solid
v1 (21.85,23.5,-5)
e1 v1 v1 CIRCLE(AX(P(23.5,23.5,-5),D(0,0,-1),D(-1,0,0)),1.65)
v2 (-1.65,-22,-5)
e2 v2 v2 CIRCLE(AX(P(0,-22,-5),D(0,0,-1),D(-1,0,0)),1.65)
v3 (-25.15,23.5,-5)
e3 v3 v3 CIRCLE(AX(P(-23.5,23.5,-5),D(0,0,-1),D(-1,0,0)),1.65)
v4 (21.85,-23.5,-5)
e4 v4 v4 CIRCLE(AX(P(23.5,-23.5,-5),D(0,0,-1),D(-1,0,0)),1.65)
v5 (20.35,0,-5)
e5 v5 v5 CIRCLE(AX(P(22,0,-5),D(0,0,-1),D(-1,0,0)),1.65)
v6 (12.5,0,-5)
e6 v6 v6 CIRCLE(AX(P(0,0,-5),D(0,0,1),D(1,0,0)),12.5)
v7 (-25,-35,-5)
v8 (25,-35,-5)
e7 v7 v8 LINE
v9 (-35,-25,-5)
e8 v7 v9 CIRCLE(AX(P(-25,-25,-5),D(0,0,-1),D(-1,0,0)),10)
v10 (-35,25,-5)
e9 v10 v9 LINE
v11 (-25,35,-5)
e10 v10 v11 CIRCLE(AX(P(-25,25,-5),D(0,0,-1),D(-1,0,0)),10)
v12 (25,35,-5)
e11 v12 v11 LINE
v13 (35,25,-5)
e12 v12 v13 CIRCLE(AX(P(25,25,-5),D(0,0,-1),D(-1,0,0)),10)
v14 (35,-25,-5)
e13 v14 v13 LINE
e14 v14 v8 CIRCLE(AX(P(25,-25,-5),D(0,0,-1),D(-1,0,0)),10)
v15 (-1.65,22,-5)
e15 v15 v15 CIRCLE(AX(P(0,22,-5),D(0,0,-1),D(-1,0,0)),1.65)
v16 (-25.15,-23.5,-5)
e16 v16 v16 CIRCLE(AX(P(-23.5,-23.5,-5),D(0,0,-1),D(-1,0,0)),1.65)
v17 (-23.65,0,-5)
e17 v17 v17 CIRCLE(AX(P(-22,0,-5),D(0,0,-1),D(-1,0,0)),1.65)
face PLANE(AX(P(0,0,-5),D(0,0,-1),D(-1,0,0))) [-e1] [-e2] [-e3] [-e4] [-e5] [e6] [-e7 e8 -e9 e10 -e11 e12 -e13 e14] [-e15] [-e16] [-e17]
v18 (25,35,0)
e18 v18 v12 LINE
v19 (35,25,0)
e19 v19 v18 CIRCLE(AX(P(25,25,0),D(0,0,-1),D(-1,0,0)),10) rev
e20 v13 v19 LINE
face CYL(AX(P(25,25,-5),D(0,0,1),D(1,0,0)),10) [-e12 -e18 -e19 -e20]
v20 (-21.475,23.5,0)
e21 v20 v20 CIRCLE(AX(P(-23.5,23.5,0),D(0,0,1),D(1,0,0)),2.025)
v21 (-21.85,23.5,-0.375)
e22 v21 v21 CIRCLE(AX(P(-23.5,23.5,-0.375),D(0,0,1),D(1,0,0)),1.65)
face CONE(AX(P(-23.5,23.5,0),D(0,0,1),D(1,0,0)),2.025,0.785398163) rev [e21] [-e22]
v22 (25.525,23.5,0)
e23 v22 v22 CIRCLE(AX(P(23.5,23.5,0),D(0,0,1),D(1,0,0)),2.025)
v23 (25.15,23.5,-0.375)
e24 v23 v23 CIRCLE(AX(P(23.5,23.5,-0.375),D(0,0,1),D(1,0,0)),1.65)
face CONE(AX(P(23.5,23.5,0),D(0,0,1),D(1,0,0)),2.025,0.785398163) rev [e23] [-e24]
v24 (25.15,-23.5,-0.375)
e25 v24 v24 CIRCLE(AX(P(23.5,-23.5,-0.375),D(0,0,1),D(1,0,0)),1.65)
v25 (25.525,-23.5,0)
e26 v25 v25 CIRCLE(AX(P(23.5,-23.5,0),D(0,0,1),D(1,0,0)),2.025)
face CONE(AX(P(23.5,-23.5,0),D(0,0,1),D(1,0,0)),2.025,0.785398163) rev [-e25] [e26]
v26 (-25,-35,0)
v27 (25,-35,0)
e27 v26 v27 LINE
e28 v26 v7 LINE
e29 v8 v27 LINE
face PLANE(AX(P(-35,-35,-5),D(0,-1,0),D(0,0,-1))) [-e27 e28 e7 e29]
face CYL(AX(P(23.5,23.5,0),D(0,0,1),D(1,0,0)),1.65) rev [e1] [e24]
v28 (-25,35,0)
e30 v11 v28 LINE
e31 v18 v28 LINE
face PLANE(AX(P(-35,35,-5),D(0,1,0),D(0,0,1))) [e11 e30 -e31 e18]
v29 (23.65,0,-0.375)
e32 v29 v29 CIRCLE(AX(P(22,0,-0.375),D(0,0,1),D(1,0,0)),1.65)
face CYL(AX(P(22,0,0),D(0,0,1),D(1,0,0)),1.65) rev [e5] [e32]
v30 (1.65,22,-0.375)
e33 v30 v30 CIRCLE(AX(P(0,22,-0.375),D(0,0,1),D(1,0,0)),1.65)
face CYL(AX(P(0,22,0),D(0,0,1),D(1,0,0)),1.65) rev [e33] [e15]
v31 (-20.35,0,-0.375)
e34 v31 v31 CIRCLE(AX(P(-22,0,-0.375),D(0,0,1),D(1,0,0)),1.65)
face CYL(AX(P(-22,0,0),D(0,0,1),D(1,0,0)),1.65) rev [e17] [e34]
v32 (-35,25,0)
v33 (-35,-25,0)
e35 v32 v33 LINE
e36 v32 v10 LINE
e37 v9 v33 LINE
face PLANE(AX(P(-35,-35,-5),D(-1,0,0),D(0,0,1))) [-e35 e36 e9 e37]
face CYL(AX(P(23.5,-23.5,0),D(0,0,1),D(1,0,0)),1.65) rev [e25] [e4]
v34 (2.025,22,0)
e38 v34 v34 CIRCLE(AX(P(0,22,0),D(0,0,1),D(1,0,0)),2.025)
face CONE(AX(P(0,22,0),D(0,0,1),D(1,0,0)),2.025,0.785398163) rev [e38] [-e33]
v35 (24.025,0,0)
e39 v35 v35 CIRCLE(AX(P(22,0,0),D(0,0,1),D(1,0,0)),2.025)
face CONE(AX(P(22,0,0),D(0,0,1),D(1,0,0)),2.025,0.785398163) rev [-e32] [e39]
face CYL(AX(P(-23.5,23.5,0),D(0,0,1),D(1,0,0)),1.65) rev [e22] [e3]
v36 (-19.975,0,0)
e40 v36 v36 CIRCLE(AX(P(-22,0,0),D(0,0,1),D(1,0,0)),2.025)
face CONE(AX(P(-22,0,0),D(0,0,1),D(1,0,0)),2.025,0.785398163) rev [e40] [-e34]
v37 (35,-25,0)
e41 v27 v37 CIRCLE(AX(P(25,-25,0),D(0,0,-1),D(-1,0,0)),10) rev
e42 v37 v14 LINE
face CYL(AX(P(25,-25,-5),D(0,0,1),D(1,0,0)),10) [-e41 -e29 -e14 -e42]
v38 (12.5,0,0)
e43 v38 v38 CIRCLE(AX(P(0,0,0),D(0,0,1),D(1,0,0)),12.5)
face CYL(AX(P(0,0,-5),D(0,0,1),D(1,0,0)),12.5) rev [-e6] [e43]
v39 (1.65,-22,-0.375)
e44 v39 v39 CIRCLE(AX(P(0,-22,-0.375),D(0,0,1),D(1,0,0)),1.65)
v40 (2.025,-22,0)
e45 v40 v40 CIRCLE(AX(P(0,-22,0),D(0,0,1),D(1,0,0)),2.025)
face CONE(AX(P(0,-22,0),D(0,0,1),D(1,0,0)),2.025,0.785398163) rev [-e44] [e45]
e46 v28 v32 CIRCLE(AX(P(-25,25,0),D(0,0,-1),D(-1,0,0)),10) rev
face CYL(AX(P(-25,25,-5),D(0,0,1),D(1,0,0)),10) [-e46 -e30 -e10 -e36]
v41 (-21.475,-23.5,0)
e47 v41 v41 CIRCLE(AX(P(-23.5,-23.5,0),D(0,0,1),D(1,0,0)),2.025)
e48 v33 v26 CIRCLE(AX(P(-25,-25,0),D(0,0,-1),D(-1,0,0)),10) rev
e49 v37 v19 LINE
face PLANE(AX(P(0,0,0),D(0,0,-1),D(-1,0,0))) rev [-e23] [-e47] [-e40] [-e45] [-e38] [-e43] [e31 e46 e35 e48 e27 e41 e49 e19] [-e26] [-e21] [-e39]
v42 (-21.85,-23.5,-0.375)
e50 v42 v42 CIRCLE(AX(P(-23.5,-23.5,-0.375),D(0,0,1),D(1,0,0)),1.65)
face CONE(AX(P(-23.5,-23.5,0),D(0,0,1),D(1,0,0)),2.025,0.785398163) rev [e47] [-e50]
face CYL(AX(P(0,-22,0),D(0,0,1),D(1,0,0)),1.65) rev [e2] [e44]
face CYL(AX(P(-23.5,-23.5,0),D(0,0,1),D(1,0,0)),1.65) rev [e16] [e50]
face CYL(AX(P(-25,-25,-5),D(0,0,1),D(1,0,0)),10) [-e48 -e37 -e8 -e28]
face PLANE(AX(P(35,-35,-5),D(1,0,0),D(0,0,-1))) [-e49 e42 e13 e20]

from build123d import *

# Parameters (mm, degrees)
SKETCH1_W                       = 70
SKETCH1_H                       = 70
SKETCH1_R                       = 12.5
BASE_FLANGE1_DEPTH              = 5
M4X0_7_TAPPED_HOLE1_D           = 3.3
M4X0_7_TAPPED_HOLE1_DEPTH       = 10.1
M4X0_7_TAPPED_HOLE1_CSINK_D     = 4.05
M4X0_7_TAPPED_HOLE1_CSINK_ANGLE = 90
M4X0_7_TAPPED_HOLE1_TIP         = 0.991420021
M4X0_7_TAPPED_HOLE2_D           = 3.3
M4X0_7_TAPPED_HOLE2_DEPTH       = 10.1
M4X0_7_TAPPED_HOLE2_CSINK_D     = 4.05
M4X0_7_TAPPED_HOLE2_CSINK_ANGLE = 90
M4X0_7_TAPPED_HOLE2_TIP         = 0.991420021
FILLET1_R                       = 10


# Sheet-metal steps are written as plain solids
with BuildPart() as part:
    # Sketch1 → Base-Flange1 (new body)
    with BuildSketch(Plane.XY):
        Rectangle(SKETCH1_W, SKETCH1_H)
        Circle(SKETCH1_R, mode=Mode.SUBTRACT)
    extrude(amount=-BASE_FLANGE1_DEPTH)

    # M4x0.7 Tapped Hole1
    with Locations(Plane.XY):
        with Locations((0, 22), (-22, 0), (0, -22), (22, 0)):
            CounterSinkHole(M4X0_7_TAPPED_HOLE1_D / 2, M4X0_7_TAPPED_HOLE1_CSINK_D / 2, depth=M4X0_7_TAPPED_HOLE1_DEPTH, counter_sink_angle=M4X0_7_TAPPED_HOLE1_CSINK_ANGLE)
            with Locations((0, 0, -(M4X0_7_TAPPED_HOLE1_DEPTH + M4X0_7_TAPPED_HOLE1_TIP / 2))):  # 118° drill point
                Cone(0, M4X0_7_TAPPED_HOLE1_D / 2, M4X0_7_TAPPED_HOLE1_TIP, mode=Mode.SUBTRACT)

    # M4x0.7 Tapped Hole2
    with Locations(Plane.XY):
        with Locations((-23.5, 23.5), (23.5, 23.5), (23.5, -23.5), (-23.5, -23.5)):
            CounterSinkHole(M4X0_7_TAPPED_HOLE2_D / 2, M4X0_7_TAPPED_HOLE2_CSINK_D / 2, depth=M4X0_7_TAPPED_HOLE2_DEPTH, counter_sink_angle=M4X0_7_TAPPED_HOLE2_CSINK_ANGLE)
            with Locations((0, 0, -(M4X0_7_TAPPED_HOLE2_DEPTH + M4X0_7_TAPPED_HOLE2_TIP / 2))):  # 118° drill point
                Cone(0, M4X0_7_TAPPED_HOLE2_D / 2, M4X0_7_TAPPED_HOLE2_TIP, mode=Mode.SUBTRACT)

    # Fillet1
    fillet1_edges = [part.edges().sort_by_distance(p)[0] for p in [
        (35, -35, -2.5),
        (-35, -35, -2.5),
        (-35, 35, -2.5),
        (35, 35, -2.5),
    ]]
    fillet(fillet1_edges, radius=FILLET1_R)


solid = part.part
